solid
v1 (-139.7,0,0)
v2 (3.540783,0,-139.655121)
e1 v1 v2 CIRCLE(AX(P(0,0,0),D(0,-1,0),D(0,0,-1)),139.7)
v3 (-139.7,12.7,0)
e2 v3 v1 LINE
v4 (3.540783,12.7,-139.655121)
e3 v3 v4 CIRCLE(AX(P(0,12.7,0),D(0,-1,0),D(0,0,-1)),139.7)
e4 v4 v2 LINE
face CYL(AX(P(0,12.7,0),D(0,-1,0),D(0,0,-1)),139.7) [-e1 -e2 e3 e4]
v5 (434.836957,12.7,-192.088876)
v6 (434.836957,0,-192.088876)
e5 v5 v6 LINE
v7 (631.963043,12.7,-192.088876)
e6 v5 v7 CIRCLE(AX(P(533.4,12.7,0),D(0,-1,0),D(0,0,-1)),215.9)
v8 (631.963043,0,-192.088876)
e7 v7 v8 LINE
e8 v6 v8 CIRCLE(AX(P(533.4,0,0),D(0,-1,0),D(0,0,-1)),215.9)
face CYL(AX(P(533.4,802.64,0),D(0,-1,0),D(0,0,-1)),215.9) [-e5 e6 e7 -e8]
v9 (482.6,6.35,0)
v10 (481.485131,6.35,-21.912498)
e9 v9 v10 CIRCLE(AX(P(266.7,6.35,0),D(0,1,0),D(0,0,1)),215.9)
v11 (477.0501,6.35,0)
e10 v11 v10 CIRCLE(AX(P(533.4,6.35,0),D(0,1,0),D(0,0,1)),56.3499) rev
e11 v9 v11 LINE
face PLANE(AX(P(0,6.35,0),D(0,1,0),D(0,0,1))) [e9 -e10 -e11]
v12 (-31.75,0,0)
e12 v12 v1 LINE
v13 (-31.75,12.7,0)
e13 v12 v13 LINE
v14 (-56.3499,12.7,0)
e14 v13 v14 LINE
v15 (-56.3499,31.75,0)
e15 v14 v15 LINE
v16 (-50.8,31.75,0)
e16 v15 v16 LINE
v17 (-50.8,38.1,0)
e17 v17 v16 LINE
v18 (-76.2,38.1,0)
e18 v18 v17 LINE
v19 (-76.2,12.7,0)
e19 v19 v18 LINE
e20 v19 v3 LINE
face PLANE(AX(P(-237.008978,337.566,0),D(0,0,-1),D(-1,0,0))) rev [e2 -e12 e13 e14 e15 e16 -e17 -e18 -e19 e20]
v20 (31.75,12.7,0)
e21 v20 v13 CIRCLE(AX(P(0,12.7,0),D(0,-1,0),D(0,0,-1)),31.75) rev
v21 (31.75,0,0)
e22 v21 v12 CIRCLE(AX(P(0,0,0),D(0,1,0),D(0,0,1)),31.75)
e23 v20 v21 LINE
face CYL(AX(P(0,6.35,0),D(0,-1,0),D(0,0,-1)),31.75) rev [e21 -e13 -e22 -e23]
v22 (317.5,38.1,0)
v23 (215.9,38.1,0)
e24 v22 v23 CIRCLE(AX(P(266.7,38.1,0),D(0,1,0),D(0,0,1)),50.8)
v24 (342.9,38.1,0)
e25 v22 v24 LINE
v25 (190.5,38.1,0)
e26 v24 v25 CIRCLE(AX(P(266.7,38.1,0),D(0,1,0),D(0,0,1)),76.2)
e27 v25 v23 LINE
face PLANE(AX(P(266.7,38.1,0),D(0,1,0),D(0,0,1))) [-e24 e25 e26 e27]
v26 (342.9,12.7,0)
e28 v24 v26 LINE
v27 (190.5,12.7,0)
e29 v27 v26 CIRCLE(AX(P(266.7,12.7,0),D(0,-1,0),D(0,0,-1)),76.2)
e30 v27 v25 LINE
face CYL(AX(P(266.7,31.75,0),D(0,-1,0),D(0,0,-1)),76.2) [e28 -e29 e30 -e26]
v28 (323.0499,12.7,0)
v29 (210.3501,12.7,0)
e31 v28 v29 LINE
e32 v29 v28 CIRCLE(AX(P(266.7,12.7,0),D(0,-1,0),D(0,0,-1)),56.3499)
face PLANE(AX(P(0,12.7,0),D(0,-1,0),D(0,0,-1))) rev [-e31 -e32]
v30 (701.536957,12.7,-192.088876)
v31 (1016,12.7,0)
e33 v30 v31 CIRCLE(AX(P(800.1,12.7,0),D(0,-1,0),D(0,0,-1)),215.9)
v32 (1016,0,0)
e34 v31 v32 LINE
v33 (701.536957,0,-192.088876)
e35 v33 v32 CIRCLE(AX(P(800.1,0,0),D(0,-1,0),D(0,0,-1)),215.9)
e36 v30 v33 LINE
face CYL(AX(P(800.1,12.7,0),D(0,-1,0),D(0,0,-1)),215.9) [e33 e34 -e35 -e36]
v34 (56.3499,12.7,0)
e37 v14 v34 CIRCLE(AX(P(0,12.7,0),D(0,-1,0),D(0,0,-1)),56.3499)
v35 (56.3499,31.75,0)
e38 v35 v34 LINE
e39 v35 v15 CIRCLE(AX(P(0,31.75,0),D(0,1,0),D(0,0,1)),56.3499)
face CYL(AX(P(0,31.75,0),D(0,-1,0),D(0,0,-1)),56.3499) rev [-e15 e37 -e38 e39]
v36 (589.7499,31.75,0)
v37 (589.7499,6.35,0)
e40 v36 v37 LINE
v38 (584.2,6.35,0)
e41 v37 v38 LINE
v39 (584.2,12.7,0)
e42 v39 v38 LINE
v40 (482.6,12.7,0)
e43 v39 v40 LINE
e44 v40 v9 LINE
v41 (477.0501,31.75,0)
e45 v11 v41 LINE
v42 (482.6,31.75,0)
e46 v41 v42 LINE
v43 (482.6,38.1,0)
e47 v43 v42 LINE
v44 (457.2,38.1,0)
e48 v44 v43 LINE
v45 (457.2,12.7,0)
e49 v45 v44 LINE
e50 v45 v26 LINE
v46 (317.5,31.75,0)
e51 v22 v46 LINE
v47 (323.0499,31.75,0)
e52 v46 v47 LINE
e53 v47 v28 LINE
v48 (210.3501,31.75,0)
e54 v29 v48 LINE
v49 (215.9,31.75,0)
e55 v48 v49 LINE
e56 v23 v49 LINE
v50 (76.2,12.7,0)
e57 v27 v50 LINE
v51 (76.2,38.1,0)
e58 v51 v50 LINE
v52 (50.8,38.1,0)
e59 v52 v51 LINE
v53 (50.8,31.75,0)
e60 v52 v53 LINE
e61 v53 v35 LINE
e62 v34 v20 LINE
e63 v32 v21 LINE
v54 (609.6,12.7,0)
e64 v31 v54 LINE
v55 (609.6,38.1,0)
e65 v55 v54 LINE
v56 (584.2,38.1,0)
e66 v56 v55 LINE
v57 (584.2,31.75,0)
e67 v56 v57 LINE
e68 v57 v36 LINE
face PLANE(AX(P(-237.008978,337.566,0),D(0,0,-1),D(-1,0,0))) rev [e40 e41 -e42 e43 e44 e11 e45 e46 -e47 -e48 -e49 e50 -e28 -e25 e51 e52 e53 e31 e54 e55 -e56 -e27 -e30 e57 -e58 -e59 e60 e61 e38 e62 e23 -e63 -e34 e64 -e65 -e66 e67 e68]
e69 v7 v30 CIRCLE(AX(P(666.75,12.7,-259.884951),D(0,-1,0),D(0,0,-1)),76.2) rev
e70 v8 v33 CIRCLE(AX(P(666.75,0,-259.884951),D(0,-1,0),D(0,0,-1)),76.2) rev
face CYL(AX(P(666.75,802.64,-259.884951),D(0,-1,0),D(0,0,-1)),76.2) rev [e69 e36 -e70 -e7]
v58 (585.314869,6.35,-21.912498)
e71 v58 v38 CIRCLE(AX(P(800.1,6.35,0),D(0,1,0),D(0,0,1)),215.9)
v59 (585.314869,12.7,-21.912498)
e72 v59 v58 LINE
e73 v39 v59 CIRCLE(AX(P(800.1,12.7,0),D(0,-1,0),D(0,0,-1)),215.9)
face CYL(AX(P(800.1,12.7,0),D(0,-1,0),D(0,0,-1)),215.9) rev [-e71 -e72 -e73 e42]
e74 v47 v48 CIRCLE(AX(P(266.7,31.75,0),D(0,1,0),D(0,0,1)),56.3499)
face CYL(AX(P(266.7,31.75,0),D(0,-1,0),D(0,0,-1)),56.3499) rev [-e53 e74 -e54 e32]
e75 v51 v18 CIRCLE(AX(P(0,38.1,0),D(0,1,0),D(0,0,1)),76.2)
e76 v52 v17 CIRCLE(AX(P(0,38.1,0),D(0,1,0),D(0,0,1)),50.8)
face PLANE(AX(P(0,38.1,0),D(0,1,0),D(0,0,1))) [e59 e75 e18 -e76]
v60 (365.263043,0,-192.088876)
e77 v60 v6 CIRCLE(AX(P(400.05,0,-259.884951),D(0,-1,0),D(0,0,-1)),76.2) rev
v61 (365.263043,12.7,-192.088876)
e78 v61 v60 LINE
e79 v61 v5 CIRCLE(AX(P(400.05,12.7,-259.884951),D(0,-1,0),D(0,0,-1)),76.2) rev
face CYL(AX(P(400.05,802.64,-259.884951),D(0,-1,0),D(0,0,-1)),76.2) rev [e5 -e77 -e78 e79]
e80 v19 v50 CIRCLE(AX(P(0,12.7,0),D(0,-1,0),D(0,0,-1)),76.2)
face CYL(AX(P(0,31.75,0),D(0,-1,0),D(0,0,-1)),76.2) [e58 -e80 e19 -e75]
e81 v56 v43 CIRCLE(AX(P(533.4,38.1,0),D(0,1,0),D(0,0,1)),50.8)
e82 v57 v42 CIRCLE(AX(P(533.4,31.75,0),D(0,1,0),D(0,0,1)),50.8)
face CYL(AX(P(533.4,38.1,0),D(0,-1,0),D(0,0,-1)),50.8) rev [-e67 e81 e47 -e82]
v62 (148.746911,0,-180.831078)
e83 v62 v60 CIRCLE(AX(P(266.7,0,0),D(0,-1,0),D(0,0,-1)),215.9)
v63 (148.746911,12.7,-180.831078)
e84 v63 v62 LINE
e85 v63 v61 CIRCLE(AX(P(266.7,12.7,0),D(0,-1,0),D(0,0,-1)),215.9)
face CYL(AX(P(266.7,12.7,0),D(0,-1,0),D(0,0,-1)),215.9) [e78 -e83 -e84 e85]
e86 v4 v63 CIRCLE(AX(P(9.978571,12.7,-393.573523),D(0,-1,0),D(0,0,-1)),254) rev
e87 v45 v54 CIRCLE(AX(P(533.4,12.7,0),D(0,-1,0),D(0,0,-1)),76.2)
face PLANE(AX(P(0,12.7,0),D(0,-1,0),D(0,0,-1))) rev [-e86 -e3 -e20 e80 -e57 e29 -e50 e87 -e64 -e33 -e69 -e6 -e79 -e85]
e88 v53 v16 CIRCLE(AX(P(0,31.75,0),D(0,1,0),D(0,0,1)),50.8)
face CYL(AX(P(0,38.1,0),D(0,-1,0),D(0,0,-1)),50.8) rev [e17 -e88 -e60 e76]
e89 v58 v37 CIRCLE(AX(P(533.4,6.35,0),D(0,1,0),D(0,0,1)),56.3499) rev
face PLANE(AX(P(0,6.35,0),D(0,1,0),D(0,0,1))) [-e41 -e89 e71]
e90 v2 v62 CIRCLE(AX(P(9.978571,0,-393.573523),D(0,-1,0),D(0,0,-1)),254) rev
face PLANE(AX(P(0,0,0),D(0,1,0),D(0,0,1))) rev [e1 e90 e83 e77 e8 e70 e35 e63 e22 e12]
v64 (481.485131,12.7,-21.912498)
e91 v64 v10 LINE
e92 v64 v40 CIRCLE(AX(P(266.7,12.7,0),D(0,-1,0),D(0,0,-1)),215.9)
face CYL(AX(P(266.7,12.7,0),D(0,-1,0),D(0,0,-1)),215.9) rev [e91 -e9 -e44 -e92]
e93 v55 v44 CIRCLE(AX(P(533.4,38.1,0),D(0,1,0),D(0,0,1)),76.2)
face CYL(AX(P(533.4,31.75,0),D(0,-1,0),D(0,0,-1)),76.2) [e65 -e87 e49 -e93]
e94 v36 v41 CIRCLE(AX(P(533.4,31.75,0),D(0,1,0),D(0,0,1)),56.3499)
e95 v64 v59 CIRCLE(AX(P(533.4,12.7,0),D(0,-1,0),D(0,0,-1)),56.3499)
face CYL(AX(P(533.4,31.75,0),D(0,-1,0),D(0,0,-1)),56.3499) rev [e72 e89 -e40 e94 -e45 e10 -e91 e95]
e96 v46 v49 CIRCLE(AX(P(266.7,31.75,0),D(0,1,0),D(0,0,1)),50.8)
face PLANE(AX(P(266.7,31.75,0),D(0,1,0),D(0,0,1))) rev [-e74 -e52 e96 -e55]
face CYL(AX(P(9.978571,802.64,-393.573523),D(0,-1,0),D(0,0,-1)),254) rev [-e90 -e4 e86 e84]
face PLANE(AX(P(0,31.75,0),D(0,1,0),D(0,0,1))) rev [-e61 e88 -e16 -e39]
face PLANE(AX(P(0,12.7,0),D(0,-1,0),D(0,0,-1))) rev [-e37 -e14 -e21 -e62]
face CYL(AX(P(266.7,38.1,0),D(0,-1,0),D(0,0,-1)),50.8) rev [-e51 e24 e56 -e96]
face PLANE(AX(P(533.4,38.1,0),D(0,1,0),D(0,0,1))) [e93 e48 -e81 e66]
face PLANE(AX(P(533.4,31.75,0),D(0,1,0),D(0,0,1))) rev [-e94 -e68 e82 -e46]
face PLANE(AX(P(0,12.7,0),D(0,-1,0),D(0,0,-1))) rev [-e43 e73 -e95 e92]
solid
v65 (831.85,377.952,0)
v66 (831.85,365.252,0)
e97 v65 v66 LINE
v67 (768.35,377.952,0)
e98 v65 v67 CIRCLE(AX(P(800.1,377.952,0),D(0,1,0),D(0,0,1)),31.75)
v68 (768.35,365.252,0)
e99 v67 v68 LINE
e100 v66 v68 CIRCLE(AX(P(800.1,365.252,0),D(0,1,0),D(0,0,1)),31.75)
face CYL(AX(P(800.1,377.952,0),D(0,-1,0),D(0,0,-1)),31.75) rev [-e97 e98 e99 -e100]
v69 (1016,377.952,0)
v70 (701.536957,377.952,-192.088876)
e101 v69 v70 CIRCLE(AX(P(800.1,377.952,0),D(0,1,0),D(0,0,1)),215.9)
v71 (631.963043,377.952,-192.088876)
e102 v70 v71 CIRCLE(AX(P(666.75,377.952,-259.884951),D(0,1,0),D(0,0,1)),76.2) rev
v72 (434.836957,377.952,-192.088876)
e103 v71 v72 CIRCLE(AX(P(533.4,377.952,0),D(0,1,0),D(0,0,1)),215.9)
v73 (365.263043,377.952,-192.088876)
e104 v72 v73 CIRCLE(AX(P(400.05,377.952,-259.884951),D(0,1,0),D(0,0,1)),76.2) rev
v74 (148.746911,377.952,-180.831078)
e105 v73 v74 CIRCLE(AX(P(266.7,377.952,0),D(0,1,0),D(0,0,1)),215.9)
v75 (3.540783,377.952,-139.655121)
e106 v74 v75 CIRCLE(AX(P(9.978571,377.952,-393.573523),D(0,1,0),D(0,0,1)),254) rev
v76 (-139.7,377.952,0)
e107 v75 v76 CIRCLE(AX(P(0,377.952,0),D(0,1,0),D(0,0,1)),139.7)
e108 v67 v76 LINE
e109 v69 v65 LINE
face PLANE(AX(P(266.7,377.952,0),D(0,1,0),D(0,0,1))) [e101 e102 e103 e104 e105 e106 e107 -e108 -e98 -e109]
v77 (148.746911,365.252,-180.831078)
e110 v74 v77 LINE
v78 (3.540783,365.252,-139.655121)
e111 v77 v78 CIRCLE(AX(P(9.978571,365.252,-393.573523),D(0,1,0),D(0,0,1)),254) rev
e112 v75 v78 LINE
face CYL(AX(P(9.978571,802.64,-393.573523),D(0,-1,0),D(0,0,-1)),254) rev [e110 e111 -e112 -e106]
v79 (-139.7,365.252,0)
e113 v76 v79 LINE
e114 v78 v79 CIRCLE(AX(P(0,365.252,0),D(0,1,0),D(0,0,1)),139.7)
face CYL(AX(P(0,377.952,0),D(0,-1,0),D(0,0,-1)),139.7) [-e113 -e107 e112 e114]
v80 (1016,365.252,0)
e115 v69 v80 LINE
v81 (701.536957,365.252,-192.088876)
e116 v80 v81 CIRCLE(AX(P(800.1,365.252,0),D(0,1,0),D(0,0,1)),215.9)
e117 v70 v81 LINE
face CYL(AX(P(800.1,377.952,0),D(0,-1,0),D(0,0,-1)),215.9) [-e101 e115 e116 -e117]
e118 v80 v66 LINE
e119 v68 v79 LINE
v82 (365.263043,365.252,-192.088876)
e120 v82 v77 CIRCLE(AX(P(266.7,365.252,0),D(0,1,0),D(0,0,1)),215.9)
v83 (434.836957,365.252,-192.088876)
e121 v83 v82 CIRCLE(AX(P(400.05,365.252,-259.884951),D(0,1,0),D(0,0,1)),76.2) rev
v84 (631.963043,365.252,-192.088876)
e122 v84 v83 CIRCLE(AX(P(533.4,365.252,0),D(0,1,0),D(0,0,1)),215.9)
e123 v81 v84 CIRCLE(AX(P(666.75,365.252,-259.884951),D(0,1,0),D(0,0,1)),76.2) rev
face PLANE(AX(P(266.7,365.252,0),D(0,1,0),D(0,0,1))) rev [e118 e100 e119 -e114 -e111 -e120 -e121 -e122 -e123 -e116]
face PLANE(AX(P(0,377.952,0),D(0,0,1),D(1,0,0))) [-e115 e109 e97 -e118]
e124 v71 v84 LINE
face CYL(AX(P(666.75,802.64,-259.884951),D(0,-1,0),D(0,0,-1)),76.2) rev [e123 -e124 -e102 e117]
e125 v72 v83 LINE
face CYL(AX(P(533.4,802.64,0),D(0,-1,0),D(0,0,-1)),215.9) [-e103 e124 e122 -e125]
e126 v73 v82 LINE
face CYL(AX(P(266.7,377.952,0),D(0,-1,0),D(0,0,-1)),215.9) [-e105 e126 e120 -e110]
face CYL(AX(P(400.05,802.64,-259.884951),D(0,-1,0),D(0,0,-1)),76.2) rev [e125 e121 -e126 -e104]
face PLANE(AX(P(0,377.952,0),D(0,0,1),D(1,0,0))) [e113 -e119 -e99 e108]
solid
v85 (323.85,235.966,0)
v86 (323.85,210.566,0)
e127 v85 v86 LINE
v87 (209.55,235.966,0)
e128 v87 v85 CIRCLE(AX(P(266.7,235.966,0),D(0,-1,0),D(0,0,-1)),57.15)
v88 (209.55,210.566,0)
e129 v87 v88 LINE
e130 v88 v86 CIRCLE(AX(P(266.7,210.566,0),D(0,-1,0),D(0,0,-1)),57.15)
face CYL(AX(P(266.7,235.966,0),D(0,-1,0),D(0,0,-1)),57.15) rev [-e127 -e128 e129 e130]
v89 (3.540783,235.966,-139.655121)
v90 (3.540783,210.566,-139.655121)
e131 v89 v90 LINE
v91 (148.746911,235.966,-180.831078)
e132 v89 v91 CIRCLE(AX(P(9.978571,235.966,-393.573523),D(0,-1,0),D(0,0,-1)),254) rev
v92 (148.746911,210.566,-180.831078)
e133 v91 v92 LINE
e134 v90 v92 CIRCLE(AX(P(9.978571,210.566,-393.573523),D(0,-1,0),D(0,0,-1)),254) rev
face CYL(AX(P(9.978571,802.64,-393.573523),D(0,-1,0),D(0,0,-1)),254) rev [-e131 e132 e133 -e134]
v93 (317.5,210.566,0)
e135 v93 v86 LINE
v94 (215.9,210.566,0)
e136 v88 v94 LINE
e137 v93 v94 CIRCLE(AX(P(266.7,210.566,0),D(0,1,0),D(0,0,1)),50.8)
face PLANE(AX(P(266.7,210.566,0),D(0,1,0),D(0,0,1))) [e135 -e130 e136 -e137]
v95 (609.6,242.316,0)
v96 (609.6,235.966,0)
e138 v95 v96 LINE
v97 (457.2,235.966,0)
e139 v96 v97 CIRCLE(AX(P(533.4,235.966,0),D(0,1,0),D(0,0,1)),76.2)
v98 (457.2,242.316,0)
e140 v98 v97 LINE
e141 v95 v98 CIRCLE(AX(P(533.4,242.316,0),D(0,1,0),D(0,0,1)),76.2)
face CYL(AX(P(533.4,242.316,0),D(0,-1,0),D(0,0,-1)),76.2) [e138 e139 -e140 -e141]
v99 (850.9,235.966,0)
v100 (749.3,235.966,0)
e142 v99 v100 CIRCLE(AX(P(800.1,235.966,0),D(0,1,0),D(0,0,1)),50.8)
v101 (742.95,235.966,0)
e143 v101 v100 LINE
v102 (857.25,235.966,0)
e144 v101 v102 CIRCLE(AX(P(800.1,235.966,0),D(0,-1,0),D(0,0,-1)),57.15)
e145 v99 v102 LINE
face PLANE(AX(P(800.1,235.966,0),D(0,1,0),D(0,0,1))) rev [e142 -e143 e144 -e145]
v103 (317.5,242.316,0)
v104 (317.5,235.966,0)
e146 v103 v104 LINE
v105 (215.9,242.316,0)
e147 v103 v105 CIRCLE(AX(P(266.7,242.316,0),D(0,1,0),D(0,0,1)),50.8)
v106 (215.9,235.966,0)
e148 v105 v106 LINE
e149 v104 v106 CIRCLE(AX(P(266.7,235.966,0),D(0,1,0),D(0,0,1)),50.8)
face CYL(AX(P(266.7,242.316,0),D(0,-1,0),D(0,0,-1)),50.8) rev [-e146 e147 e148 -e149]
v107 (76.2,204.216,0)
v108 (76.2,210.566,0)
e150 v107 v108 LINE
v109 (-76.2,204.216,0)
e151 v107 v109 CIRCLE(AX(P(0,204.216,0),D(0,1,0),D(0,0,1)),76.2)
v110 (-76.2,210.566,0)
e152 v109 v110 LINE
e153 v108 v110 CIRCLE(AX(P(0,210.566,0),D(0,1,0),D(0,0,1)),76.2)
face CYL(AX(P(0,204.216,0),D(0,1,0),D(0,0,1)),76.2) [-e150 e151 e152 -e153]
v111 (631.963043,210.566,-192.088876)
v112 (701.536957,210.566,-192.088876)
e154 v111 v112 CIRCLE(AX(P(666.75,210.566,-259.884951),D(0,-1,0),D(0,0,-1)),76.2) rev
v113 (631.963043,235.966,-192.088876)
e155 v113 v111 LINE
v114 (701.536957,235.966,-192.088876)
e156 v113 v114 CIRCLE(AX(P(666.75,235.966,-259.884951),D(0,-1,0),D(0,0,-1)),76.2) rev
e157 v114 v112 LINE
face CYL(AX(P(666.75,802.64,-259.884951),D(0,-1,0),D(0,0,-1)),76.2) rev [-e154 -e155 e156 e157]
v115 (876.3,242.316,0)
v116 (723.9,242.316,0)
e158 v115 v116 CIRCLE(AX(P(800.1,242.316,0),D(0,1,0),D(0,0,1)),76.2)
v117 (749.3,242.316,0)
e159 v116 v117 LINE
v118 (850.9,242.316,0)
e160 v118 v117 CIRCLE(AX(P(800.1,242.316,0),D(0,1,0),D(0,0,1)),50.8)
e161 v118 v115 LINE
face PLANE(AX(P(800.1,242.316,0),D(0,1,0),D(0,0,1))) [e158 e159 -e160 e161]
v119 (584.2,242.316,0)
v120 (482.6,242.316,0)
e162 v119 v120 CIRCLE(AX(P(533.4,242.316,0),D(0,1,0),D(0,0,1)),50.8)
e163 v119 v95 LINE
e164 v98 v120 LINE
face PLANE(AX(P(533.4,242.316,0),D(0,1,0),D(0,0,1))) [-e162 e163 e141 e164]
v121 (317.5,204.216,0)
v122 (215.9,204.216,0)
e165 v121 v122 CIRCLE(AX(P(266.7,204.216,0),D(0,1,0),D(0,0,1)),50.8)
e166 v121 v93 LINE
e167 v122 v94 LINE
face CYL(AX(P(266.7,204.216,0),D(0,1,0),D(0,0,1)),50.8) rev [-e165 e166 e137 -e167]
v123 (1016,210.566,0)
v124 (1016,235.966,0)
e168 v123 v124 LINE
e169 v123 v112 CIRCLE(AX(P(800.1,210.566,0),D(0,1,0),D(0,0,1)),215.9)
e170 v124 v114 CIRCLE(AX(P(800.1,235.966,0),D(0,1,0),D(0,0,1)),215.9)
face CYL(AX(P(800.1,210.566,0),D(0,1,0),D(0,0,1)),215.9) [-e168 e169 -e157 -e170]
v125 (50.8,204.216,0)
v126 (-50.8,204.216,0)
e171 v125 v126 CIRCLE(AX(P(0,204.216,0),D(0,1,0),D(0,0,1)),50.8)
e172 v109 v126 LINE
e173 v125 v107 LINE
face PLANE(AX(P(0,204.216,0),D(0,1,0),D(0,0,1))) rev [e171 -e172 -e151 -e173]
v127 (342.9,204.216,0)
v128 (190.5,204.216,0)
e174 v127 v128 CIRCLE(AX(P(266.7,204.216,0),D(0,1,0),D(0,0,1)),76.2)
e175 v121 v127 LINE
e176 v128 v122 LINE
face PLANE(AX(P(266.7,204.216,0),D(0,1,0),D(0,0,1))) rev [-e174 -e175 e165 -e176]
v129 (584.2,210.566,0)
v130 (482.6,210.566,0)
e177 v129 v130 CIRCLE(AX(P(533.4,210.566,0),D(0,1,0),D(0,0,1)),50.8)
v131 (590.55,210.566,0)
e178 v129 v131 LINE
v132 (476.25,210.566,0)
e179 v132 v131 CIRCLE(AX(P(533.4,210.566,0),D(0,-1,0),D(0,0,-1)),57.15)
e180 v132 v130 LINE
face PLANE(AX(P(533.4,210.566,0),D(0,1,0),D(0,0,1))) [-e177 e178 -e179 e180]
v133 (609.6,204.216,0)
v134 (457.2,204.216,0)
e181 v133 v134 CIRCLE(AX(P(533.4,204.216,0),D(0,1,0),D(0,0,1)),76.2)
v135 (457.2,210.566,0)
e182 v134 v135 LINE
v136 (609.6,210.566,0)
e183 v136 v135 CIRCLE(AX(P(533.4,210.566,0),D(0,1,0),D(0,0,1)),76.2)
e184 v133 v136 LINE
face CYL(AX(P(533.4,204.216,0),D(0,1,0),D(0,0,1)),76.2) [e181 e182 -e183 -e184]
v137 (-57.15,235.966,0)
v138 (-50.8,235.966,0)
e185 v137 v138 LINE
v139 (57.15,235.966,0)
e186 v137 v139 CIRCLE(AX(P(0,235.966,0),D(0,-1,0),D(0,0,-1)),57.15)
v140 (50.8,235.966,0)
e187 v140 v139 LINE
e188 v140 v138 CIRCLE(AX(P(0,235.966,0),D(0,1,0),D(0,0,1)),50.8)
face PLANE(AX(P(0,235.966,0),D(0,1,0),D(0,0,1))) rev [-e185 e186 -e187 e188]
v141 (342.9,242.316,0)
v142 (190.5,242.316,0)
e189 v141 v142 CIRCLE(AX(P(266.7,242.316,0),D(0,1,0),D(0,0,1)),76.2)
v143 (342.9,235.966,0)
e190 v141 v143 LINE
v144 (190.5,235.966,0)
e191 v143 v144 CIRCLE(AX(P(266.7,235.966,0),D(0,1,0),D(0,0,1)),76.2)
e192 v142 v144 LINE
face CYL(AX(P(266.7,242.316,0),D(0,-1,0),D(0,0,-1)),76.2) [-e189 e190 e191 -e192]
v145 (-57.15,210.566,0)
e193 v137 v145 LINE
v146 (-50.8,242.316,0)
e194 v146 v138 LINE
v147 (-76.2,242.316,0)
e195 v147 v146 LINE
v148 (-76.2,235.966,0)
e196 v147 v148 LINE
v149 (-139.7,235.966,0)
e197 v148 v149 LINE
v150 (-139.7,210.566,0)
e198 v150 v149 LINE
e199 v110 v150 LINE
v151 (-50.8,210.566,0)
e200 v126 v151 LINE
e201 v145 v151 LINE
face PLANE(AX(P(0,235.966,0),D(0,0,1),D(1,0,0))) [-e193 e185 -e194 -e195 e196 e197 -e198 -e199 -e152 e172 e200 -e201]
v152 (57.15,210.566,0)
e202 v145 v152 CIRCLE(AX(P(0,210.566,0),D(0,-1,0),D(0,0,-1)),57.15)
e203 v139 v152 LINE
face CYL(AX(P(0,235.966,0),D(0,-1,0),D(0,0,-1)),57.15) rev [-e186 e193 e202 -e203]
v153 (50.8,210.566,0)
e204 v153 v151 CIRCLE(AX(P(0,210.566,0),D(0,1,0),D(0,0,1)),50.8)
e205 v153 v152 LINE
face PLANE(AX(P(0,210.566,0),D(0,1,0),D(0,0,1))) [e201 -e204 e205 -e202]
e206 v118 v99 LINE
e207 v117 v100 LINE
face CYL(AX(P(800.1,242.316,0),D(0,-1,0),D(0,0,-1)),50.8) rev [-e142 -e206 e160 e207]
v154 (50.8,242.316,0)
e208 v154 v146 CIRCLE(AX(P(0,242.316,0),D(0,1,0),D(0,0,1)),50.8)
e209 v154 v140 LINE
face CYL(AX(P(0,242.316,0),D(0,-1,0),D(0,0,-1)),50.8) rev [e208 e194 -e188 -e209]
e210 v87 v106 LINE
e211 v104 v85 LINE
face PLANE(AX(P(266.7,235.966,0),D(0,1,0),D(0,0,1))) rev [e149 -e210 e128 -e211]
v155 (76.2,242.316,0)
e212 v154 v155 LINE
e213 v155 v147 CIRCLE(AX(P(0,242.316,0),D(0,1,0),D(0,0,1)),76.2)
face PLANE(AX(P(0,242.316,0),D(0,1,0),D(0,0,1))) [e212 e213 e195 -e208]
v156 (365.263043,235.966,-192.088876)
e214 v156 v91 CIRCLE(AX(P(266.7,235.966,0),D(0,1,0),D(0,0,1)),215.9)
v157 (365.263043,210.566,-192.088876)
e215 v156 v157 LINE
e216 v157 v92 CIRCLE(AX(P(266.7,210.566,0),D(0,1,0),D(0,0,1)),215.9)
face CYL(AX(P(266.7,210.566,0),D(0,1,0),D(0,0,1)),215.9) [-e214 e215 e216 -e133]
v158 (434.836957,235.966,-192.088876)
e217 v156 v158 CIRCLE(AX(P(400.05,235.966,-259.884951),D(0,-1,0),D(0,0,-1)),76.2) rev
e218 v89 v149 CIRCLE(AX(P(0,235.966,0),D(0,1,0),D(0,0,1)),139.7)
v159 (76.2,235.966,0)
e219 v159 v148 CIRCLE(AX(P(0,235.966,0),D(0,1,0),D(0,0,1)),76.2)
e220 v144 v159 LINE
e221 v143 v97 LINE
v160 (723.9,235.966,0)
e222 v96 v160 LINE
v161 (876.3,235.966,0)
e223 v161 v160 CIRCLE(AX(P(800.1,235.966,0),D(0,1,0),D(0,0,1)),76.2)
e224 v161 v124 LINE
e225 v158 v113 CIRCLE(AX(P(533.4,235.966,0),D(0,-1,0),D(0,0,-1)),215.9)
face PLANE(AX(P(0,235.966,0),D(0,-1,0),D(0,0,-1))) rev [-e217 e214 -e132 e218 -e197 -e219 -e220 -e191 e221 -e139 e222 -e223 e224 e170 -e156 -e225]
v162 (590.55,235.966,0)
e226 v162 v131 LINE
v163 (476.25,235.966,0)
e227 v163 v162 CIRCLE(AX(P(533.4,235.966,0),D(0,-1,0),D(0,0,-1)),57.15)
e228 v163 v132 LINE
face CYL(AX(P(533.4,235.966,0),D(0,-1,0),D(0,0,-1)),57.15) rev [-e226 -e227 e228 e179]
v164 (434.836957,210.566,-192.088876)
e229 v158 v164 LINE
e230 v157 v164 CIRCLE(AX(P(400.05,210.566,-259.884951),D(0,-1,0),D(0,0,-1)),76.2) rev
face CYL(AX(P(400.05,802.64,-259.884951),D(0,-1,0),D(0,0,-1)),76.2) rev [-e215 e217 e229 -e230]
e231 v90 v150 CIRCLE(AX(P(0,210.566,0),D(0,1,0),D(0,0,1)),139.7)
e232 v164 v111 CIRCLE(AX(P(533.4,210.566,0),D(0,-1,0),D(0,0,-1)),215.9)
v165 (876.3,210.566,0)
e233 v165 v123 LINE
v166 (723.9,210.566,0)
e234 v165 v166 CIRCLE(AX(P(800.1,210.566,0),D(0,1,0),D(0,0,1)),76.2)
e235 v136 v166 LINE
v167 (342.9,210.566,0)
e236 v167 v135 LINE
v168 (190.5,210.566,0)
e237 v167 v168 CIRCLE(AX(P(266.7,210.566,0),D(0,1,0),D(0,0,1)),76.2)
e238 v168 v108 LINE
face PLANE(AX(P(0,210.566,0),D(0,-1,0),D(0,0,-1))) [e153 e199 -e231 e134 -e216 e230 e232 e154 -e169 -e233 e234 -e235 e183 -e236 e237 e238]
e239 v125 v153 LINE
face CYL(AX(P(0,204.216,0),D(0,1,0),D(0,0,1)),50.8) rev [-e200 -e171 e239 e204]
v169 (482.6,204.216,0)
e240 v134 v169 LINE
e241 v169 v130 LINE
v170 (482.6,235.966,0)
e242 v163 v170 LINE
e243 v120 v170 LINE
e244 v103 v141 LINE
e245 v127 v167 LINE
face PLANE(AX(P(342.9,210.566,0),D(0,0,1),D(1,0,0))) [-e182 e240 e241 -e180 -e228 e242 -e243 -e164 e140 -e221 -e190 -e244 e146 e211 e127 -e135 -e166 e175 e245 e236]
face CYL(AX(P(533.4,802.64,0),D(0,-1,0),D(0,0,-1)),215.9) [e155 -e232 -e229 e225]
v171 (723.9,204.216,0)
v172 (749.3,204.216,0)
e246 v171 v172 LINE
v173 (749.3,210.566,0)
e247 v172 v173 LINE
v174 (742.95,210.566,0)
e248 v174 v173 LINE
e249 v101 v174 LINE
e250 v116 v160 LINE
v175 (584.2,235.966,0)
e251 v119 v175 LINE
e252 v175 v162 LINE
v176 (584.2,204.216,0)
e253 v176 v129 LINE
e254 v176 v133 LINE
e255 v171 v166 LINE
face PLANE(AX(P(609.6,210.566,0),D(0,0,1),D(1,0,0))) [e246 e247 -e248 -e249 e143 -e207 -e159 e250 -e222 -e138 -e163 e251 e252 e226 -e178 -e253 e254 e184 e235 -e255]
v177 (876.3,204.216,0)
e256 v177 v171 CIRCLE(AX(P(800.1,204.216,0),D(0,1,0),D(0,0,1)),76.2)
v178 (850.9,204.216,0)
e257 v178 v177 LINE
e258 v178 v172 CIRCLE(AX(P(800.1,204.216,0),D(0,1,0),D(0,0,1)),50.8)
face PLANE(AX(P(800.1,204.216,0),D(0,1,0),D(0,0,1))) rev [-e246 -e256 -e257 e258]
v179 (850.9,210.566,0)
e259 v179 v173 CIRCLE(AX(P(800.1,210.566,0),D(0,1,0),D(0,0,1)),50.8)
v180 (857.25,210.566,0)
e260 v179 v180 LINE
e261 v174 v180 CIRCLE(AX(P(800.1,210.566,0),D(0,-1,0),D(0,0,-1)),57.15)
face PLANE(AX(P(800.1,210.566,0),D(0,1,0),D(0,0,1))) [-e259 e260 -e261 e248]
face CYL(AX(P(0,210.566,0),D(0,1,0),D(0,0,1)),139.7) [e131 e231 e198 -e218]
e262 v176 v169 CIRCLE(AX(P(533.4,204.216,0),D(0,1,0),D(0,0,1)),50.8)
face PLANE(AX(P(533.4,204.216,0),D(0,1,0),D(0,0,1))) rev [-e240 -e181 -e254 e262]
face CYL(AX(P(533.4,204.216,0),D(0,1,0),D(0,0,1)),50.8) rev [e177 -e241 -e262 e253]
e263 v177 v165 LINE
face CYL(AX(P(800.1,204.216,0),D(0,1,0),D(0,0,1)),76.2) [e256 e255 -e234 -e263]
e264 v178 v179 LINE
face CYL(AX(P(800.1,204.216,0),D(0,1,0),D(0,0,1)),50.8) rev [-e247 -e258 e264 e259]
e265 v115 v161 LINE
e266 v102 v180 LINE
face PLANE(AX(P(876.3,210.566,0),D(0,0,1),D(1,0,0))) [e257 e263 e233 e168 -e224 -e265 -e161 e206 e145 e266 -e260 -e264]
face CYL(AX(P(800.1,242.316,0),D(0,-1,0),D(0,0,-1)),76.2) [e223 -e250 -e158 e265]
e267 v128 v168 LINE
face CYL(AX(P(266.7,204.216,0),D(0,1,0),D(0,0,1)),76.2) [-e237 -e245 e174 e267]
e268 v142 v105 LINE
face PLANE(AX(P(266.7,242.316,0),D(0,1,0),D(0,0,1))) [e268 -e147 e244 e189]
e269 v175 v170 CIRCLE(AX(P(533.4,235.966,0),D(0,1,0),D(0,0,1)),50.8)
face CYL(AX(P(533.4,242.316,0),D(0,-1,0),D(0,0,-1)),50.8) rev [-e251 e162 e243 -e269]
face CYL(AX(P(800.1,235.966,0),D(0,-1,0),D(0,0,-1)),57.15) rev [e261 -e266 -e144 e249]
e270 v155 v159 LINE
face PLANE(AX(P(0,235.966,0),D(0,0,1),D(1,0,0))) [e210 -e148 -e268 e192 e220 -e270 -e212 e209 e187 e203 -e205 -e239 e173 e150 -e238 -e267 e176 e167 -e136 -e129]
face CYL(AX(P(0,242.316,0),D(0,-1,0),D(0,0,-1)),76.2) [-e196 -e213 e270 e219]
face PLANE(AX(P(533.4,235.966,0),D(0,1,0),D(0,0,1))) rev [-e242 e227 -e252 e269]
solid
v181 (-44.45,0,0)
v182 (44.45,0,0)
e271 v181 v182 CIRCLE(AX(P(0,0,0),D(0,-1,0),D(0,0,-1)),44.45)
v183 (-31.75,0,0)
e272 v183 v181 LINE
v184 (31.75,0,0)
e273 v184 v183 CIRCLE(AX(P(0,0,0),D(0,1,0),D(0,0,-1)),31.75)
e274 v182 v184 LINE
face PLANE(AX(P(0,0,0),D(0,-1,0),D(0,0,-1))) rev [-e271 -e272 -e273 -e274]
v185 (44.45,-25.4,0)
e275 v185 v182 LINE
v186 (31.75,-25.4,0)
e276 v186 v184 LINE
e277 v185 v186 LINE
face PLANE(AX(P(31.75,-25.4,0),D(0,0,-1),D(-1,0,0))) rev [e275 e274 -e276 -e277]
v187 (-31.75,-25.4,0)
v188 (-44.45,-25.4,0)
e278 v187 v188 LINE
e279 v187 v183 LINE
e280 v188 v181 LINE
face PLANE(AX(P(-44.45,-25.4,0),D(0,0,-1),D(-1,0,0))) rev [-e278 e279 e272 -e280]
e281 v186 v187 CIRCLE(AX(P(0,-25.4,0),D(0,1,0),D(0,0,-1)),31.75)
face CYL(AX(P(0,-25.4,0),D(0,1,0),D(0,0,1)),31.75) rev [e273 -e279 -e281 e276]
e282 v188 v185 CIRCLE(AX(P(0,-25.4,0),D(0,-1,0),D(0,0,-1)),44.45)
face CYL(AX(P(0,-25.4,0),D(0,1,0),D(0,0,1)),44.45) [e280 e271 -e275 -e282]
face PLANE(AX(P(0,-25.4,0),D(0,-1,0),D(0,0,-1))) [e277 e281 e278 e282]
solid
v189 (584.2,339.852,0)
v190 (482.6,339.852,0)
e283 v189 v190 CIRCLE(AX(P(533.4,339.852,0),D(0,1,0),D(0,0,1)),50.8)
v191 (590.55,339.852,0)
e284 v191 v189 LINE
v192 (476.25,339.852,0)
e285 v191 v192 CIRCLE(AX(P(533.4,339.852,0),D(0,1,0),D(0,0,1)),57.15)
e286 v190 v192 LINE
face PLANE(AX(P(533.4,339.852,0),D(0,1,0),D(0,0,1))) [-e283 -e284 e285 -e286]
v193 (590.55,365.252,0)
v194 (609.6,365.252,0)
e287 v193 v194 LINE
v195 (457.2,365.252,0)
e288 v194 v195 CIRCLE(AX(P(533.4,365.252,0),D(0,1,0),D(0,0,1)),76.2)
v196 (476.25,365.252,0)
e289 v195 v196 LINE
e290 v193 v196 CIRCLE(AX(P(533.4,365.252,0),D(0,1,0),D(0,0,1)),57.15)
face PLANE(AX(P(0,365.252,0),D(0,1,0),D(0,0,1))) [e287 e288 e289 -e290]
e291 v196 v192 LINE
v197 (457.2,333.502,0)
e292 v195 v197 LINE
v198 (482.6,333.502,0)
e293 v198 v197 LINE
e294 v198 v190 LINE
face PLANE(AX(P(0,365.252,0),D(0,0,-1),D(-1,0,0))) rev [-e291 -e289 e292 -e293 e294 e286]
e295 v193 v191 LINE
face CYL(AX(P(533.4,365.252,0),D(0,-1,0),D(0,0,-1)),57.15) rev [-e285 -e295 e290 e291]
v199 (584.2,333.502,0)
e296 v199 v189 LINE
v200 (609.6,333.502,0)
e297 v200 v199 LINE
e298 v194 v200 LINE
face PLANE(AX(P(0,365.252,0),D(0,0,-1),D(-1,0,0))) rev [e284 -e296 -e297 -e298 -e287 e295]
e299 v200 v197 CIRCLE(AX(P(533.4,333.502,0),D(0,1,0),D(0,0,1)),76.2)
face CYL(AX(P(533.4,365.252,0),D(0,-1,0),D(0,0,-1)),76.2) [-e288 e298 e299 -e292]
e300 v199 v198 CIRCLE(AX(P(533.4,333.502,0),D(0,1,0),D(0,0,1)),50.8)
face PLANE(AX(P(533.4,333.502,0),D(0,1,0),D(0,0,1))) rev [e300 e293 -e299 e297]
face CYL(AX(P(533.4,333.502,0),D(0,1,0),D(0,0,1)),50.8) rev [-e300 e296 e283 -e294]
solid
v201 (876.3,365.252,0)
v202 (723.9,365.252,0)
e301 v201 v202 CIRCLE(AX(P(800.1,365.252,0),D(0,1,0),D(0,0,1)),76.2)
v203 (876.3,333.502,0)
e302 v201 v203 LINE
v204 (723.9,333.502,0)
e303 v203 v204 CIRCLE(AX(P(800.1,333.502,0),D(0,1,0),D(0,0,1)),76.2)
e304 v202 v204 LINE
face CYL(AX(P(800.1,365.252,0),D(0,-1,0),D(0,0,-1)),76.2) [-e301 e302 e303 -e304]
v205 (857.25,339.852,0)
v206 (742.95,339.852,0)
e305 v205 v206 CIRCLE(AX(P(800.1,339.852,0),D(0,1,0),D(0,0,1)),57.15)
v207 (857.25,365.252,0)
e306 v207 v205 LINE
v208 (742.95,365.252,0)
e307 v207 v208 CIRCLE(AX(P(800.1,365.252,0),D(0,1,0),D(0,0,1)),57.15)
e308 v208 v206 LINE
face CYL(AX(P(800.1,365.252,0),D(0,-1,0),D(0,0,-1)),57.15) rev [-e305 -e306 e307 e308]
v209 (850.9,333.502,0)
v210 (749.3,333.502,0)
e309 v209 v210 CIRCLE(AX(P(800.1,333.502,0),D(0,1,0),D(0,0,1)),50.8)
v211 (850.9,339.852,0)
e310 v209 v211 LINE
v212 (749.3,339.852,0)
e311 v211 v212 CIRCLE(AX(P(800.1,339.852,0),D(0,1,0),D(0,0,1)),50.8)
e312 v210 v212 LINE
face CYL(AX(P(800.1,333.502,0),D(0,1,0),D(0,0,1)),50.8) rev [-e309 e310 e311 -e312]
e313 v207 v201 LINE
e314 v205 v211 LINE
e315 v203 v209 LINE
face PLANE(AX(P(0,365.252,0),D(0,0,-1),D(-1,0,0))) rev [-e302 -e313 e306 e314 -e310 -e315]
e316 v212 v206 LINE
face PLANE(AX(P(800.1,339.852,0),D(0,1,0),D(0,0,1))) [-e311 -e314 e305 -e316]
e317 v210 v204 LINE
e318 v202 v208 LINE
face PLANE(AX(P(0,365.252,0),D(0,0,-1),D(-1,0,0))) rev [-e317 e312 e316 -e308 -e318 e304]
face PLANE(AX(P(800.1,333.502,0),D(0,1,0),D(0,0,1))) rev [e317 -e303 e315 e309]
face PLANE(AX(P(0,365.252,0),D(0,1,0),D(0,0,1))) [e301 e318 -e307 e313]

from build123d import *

# Parameters (mm, degrees)
SKETCH1_R               = 31.75
BOSS_EXTRUDE1_DEPTH     = 6.35
SKETCH1_5_R             = 76.2
SKETCH1_5_R_2           = 56.3499
BOSS_EXTRUDE2_DEPTH     = 31.75
CUT_EXTRUDE1_DEPTH      = 331.216
CUT_EXTRUDE1_DEPTH_BACK = 329.946
SKETCH3_W               = 1329.198210048
SKETCH3_H               = 309.557135386
BOSS_EXTRUDE7_DEPTH     = 6.35
LPATTERN4_COUNT         = 4
LPATTERN4_PITCH         = 266.7
BOSS_EXTRUDE9_START     = -210.566
BOSS_EXTRUDE9_DEPTH     = 25.4
LPATTERN6_COUNT         = 4
LPATTERN6_PITCH         = 266.7
BOSS_EXTRUDE10_START    = -12.7
BOSS_EXTRUDE10_DEPTH    = 12.7
BOSS_EXTRUDE11_DEPTH    = 25.4
BOSS_EXTRUDE13_DEPTH    = 6.35
BOSS_EXTRUDE14_START    = -31.75
BOSS_EXTRUDE14_DEPTH    = 6.35
LPATTERN7_COUNT         = 4
LPATTERN7_PITCH         = 266.7
SKETCH15_R              = 77.31521383
CUT_EXTRUDE4_DEPTH      = 25.4
BOSS_EXTRUDE16_START    = 97.536
BOSS_EXTRUDE16_DEPTH    = 25.4
BOSS_EXTRUDE16_2_DEPTH  = 25.4
BOSS_EXTRUDE17_START    = 91.186
BOSS_EXTRUDE17_DEPTH    = 6.35
BOSS_EXTRUDE18_START    = 122.936
BOSS_EXTRUDE18_DEPTH    = 12.7
CUT_EXTRUDE11_START     = -802.64
CUT_EXTRUDE11_DEPTH     = 802.64
BOSS_EXTRUDE27_DEPTH    = 25.4


# Read off the part's stored shape, not the designer's step: Boss-Extrude10
with BuildPart() as part:
    # Sketch1 → Boss-Extrude1 (new body)
    with BuildSketch(Plane(origin=(0, 0, 0), x_dir=(1, 0, 0), z_dir=(0, 1, 0))):
        with BuildLine():
            ThreePointArc((422.728571429, -85.252125475), (557.978233446, -137.520909104), (666.75, -41.639734629))
            ThreePointArc((666.75, -41.639734629), (912.645903808, -82.761763733), (800.1, 139.7))
            Line((800.1, 139.7), (533.4, 139.7))
            Line((533.4, 139.7), (293.135129627, 175.823843439))
            ThreePointArc((293.135129627, 175.823843439), (249.780889695, 176.99317418), (207.433333333, 167.631447593))
            Line((207.433333333, 167.631447593), (-29.633333333, 83.815723797))
            ThreePointArc((-29.633333333, 83.815723797), (-88.9, 0), (-29.633333333, -83.815723797))
            Line((-29.633333333, -83.815723797), (207.433333333, -167.631447593))
            ThreePointArc((207.433333333, -167.631447593), (330.23978857, -166.058830745), (422.728571429, -85.252125475))
        make_face()
        with Locations(Location((0, 0, 0), (0, 0, 270))):
            Circle(SKETCH1_R, mode=Mode.SUBTRACT)
    extrude(amount=BOSS_EXTRUDE1_DEPTH)

    # Sketch1<5> → Boss-Extrude2 (add)
    # profile 1 of 4: a face of its own
    with BuildSketch(Plane(origin=(0, 0, 0), x_dir=(1, 0, 0), z_dir=(0, 1, 0))):
        with Locations(Location((0, 0, 0), (0, 0, 270))):
            Circle(SKETCH1_5_R)
        with Locations(Location((0, 0, 0), (0, 0, 270))):
            Circle(SKETCH1_5_R_2, mode=Mode.SUBTRACT)
    # profile 2 of 4: a face of its own
    with BuildSketch(Plane(origin=(0, 0, 0), x_dir=(1, 0, 0), z_dir=(0, 1, 0))):
        with Locations(Location((266.7, 0, 0), (0, 0, 270))):
            Circle(SKETCH1_5_R)
        with Locations(Location((266.7, 0, 0), (0, 0, 270))):
            Circle(SKETCH1_5_R_2, mode=Mode.SUBTRACT)
    # profile 3 of 4: a face of its own
    with BuildSketch(Plane(origin=(0, 0, 0), x_dir=(1, 0, 0), z_dir=(0, 1, 0))):
        with Locations(Location((533.4, 0, 0), (0, 0, 270))):
            Circle(SKETCH1_5_R)
        with Locations(Location((533.4, 0, 0), (0, 0, 270))):
            Circle(SKETCH1_5_R_2, mode=Mode.SUBTRACT)
    # profile 4 of 4: a face of its own
    with BuildSketch(Plane(origin=(0, 0, 0), x_dir=(1, 0, 0), z_dir=(0, 1, 0))):
        with Locations(Location((800.1, 0, 0), (0, 0, 270))):
            Circle(SKETCH1_5_R)
        with Locations(Location((800.1, 0, 0), (0, 0, 270))):
            Circle(SKETCH1_5_R_2, mode=Mode.SUBTRACT)
    extrude(amount=BOSS_EXTRUDE2_DEPTH)

    # Sketch3 → Cut-Extrude1 (cut, two sides: drawn at the far end of the back side and taken through both)
    with BuildSketch(Plane(origin=(0, 6.35, 0), x_dir=(1, 0, 0), z_dir=(0, 1, 0)).offset(-CUT_EXTRUDE1_DEPTH_BACK)):
        with Locations((427.590126739, -154.778567693)):
            Rectangle(SKETCH3_W, SKETCH3_H)
    extrude(amount=CUT_EXTRUDE1_DEPTH + CUT_EXTRUDE1_DEPTH_BACK, mode=Mode.SUBTRACT)

    # Sketch5 → Boss-Extrude7 (add)
    with BuildSketch(Plane(origin=(0, 31.75, 0), x_dir=(1, 0, 0), z_dir=(0, 1, 0))):
        with BuildLine():
            ThreePointArc((56.3499, 0), (0, 56.3499), (-56.3499, 0))
            Line((-56.3499, 0), (-50.8, 0))
            ThreePointArc((-50.8, 0), (0, 50.8), (50.8, 0))
            Line((50.8, 0), (56.3499, 0))
        make_face()
        with BuildLine():
            Line((56.3499, 0), (76.2, 0))
            ThreePointArc((76.2, 0), (0, 76.2), (-76.2, 0))
            Line((-76.2, 0), (-56.3499, 0))
            ThreePointArc((-56.3499, 0), (0, 56.3499), (56.3499, 0))
        make_face()
    boss_extrude7 = extrude(amount=BOSS_EXTRUDE7_DEPTH)

    # LPattern4: Boss-Extrude7 ×4
    with Locations(*[(i * LPATTERN4_PITCH, 0, 0) for i in range(1, LPATTERN4_COUNT)]):
        add(boss_extrude7)

    # Boss-Extrude10 outline → Boss-Extrude10 (add)
    with BuildSketch(Plane.XZ.offset(BOSS_EXTRUDE10_START)):
        with BuildLine():
            ThreePointArc((-139.7, 0), (-112.009186485, -83.486718362), (-39.914285714, -133.876584196))
            Line((-39.914285714, -133.876584196), (205.014285714, -206.900175575))
            ThreePointArc((205.014285714, -206.900175575), (235.530607214, -213.638196382), (266.7, -215.9))
            Line((266.7, -215.9), (800.1, -215.9))
            ThreePointArc((800.1, -215.9), (952.764354058, -152.664354058), (1016, 0))
            Line((1016, 0), (876.3, 0))
            ThreePointArc((876.3, 0), (800.1, -76.2), (723.9, 0))
            Line((723.9, 0), (609.6, 0))
            ThreePointArc((609.6, 0), (533.4, -76.2), (457.2, 0))
            Line((457.2, 0), (342.9, 0))
            ThreePointArc((342.9, 0), (266.7, -76.2), (190.5, 0))
            Line((190.5, 0), (76.2, 0))
            ThreePointArc((76.2, 0), (0, -76.2), (-76.2, 0))
            Line((-76.2, 0), (-139.7, 0))
        make_face()
        with BuildLine():
            Line((-31.75, 0), (-56.3499, 0))
            ThreePointArc((-56.3499, 0), (0, -56.3499), (56.3499, 0))
            Line((56.3499, 0), (31.75, 0))
            ThreePointArc((31.75, 0), (0, -31.75), (-31.75, 0))
        make_face()
        with BuildLine():
            Line((323.0499, 0), (210.3501, 0))
            ThreePointArc((210.3501, 0), (266.7, -56.3499), (323.0499, 0))
        make_face()
        with BuildLine():
            Line((584.2, 0), (482.6, 0))
            ThreePointArc((482.6, 0), (482.321102562, -10.97042068), (481.485130802, -21.912498402))
            ThreePointArc((481.485130802, -21.912498402), (533.4, -56.3499), (585.314869198, -21.912498402))
            ThreePointArc((585.314869198, -21.912498402), (584.478897438, -10.97042068), (584.2, 0))
        make_face()
        with BuildLine():
            ThreePointArc((743.7501, 0), (800.1, -56.3499), (856.4499, 0))
            Line((856.4499, 0), (743.7501, 0))
        make_face()
    extrude(amount=BOSS_EXTRUDE10_DEPTH)

    # Sketch15 → Cut-Extrude4 (cut)
    with BuildSketch(Plane(origin=(0, 38.1, 0), x_dir=(1, 0, 0), z_dir=(0, 1, 0))):
        with Locations((800.1, 0)):
            Circle(SKETCH15_R)
    extrude(amount=-CUT_EXTRUDE4_DEPTH, mode=Mode.SUBTRACT)


with BuildPart() as body_2:
    # Sketch8 → Boss-Extrude9 (new body)
    with BuildSketch(Plane.XZ.offset(BOSS_EXTRUDE9_START)):
        with BuildLine():
            Line((76.2, 0), (57.15, 0))
            ThreePointArc((57.15, 0), (0, -57.15), (-57.15, 0))
            Line((-57.15, 0), (-76.2, 0))
            ThreePointArc((-76.2, 0), (0, -76.2), (76.2, 0))
        make_face()
    boss_extrude9 = extrude(amount=-BOSS_EXTRUDE9_DEPTH)



with BuildPart() as lpattern6_1:
    # LPattern6: pattern copy
    add(boss_extrude9.moved(Location(Vector(1, 0, 0) * (1 * LPATTERN6_PITCH))))


with BuildPart() as lpattern6_2:
    # LPattern6: pattern copy
    add(boss_extrude9.moved(Location(Vector(1, 0, 0) * (2 * LPATTERN6_PITCH))))


with BuildPart() as lpattern6_3:
    # LPattern6: pattern copy
    add(boss_extrude9.moved(Location(Vector(1, 0, 0) * (3 * LPATTERN6_PITCH))))


with BuildPart() as body_2_1:
    add(body_2.part)

    add(lpattern6_1.part)  # Boss-Extrude11 merges LPattern6_1

    add(lpattern6_2.part)  # Boss-Extrude11 merges LPattern6_2

    add(lpattern6_3.part)  # Boss-Extrude11 merges LPattern6_3
    # Sketch11 → Boss-Extrude11 (add)
    with BuildSketch(Plane(origin=(0, 235.966, 0), x_dir=(1, 0, 0), z_dir=(0, 1, 0))):
        with BuildLine():
            Line((76.2, 0), (190.5, 0))
            ThreePointArc((190.5, 0), (266.7, 76.2), (342.9, 0))
            Line((342.9, 0), (457.2, 0))
            ThreePointArc((457.2, 0), (533.4, 76.2), (609.6, 0))
            Line((609.6, 0), (723.9, 0))
            ThreePointArc((723.9, 0), (800.1, 76.2), (876.3, 0))
            Line((876.3, 0), (1016, 0))
            ThreePointArc((1016, 0), (952.764354058, 152.664354058), (800.1, 215.9))
            Line((800.1, 215.9), (266.7, 215.9))
            ThreePointArc((266.7, 215.9), (235.530607214, 213.638196382), (205.014285714, 206.900175575))
            Line((205.014285714, 206.900175575), (-39.914285714, 133.876584196))
            ThreePointArc((-39.914285714, 133.876584196), (-112.009186485, 83.486718362), (-139.7, 0))
            Line((-139.7, 0), (-76.2, 0))
            ThreePointArc((-76.2, 0), (0, 76.2), (76.2, 0))
        make_face()
    extrude(amount=-BOSS_EXTRUDE11_DEPTH)

    # Sketch13 → Boss-Extrude13 (add)
    with BuildSketch(Plane(origin=(0, 235.966, 0), x_dir=(1, 0, 0), z_dir=(0, 1, 0))):
        with BuildLine():
            ThreePointArc((57.15, 0), (0, 57.15), (-57.15, 0))
            Line((-57.15, 0), (-50.8, 0))
            ThreePointArc((-50.8, 0), (0, 50.8), (50.8, 0))
            Line((50.8, 0), (57.15, 0))
        make_face()
        with BuildLine():
            ThreePointArc((76.2, 0), (0, 76.2), (-76.2, 0))
            Line((-76.2, 0), (-57.15, 0))
            ThreePointArc((-57.15, 0), (0, 57.15), (57.15, 0))
            Line((57.15, 0), (76.2, 0))
        make_face()
    boss_extrude13 = extrude(amount=BOSS_EXTRUDE13_DEPTH)

    # Sketch13<4> → Boss-Extrude14 (add)
    with BuildSketch(Plane(origin=(0, 235.966, 0), x_dir=(1, 0, 0), z_dir=(0, 1, 0)).offset(BOSS_EXTRUDE14_START)):
        with BuildLine():
            ThreePointArc((76.2, 0), (0, 76.2), (-76.2, 0))
            Line((-76.2, 0), (-57.15, 0))
            ThreePointArc((-57.15, 0), (0, 57.15), (57.15, 0))
            Line((57.15, 0), (76.2, 0))
        make_face()
        with BuildLine():
            ThreePointArc((57.15, 0), (0, 57.15), (-57.15, 0))
            Line((-57.15, 0), (-50.8, 0))
            ThreePointArc((-50.8, 0), (0, 50.8), (50.8, 0))
            Line((50.8, 0), (57.15, 0))
        make_face()
    boss_extrude14 = extrude(amount=BOSS_EXTRUDE14_DEPTH)

    # LPattern7: Boss-Extrude13, Boss-Extrude14 ×4
    with Locations(*[(i * LPATTERN7_PITCH, 0, 0) for i in range(1, LPATTERN7_COUNT)]):
        add(boss_extrude13)
        add(boss_extrude14)


with BuildPart() as body_3:
    # Sketch17 → Boss-Extrude16 (new body)
    with BuildSketch(Plane(origin=(0, 242.316, 0), x_dir=(1, 0, 0), z_dir=(0, 1, 0)).offset(BOSS_EXTRUDE16_START)):
        with BuildLine():
            Line((590.55, 0), (609.6, 0))
            ThreePointArc((609.6, 0), (533.4, 76.2), (457.2, 0))
            Line((457.2, 0), (476.25, 0))
            ThreePointArc((476.25, 0), (533.4, 57.15), (590.55, 0))
        make_face()
    extrude(amount=BOSS_EXTRUDE16_DEPTH)



with BuildPart() as body_4:
    # Sketch17 → Boss-Extrude16 2 (new body)
    with BuildSketch(Plane(origin=(0, 242.316, 0), x_dir=(1, 0, 0), z_dir=(0, 1, 0)).offset(BOSS_EXTRUDE16_START)):
        with BuildLine():
            ThreePointArc((742.95, 0), (800.1, 57.15), (857.25, 0))
            Line((857.25, 0), (876.3, 0))
            ThreePointArc((876.3, 0), (800.1, 76.2), (723.9, 0))
            Line((723.9, 0), (742.95, 0))
        make_face()
    extrude(amount=BOSS_EXTRUDE16_2_DEPTH)


with BuildPart() as body_3_1:
    add(body_3.part)

    add(body_4.part)  # Boss-Extrude17 merges body 4
    # Sketch17<3> → Boss-Extrude17 (add)
    with BuildSketch(Plane(origin=(0, 242.316, 0), x_dir=(1, 0, 0), z_dir=(0, 1, 0)).offset(BOSS_EXTRUDE17_START)):
        with BuildLine():
            Line((590.55, 0), (609.6, 0))
            ThreePointArc((609.6, 0), (533.4, 76.2), (457.2, 0))
            Line((457.2, 0), (476.25, 0))
            ThreePointArc((476.25, 0), (533.4, 57.15), (590.55, 0))
        make_face()
        with BuildLine():
            Line((584.2, 0), (590.55, 0))
            ThreePointArc((590.55, 0), (533.4, 57.15), (476.25, 0))
            Line((476.25, 0), (482.6, 0))
            ThreePointArc((482.6, 0), (533.4, 50.8), (584.2, 0))
        make_face()
        with BuildLine():
            ThreePointArc((749.3, 0), (800.1, 50.8), (850.9, 0))
            Line((850.9, 0), (857.25, 0))
            ThreePointArc((857.25, 0), (800.1, 57.15), (742.95, 0))
            Line((742.95, 0), (749.3, 0))
        make_face()
        with BuildLine():
            ThreePointArc((742.95, 0), (800.1, 57.15), (857.25, 0))
            Line((857.25, 0), (876.3, 0))
            ThreePointArc((876.3, 0), (800.1, 76.2), (723.9, 0))
            Line((723.9, 0), (742.95, 0))
        make_face()
    extrude(amount=BOSS_EXTRUDE17_DEPTH)


with BuildPart() as body_4_2:
    # Sketch17<4> → Boss-Extrude18 (new body)
    with BuildSketch(Plane(origin=(0, 242.316, 0), x_dir=(1, 0, 0), z_dir=(0, 1, 0)).offset(BOSS_EXTRUDE18_START)):
        with BuildLine():
            ThreePointArc((768.35, 0), (800.1, 31.75), (831.85, 0))
            Line((831.85, 0), (1016, 0))
            ThreePointArc((1016, 0), (952.764354058, 152.664354058), (800.1, 215.9))
            Line((800.1, 215.9), (266.7, 215.9))
            ThreePointArc((266.7, 215.9), (235.530607214, 213.638196382), (205.014285714, 206.900175575))
            Line((205.014285714, 206.900175575), (-39.914285714, 133.876584196))
            ThreePointArc((-39.914285714, 133.876584196), (-112.009186485, 83.486718362), (-139.7, 0))
            Line((-139.7, 0), (768.35, 0))
        make_face()
    extrude(amount=BOSS_EXTRUDE18_DEPTH)


with BuildPart() as cut_extrude11_tool:
    # Sketch19 → Cut-Extrude11 (new body)
    with BuildSketch(Plane.XZ.offset(CUT_EXTRUDE11_START)):
        with BuildLine():
            ThreePointArc((205.014285714, -206.900175575), (175.939742435, -195.896364557), (148.746911197, -180.831078197))
            ThreePointArc((148.746911197, -180.831078197), (79.272933335, -149.208445007), (3.54078341, -139.655121112))
            ThreePointArc((3.54078341, -139.655121112), (-18.414825269, -138.480988624), (-39.914285714, -133.876584196))
            Line((-39.914285714, -133.876584196), (205.014285714, -206.900175575))
        make_face()
        with BuildLine():
            ThreePointArc((533.4, -215.9), (482.70078121, -209.86281046), (434.836956522, -192.088876462))
            ThreePointArc((434.836956522, -192.088876462), (400.05, -183.684950507), (365.263043478, -192.088876462))
            ThreePointArc((365.263043478, -192.088876462), (317.39921879, -209.86281046), (266.7, -215.9))
            Line((266.7, -215.9), (533.4, -215.9))
        make_face()
        with BuildLine():
            Line((533.4, -215.9), (800.1, -215.9))
            ThreePointArc((800.1, -215.9), (749.40078121, -209.86281046), (701.536956522, -192.088876462))
            ThreePointArc((701.536956522, -192.088876462), (666.75, -183.684950507), (631.963043478, -192.088876462))
            ThreePointArc((631.963043478, -192.088876462), (584.09921879, -209.86281046), (533.4, -215.9))
        make_face()
    extrude(amount=CUT_EXTRUDE11_DEPTH)


with BuildPart() as part_1:
    add(part.part)

    # Cut-Extrude11: cut by cut_extrude11_tool
    add(cut_extrude11_tool.part, mode=Mode.SUBTRACT)


with BuildPart() as body_2_2:
    add(body_2_1.part)

    # Cut-Extrude11: cut by cut_extrude11_tool
    add(cut_extrude11_tool.part, mode=Mode.SUBTRACT)


with BuildPart() as body_4_2_1:
    add(body_4_2.part)

    # Cut-Extrude11: cut by cut_extrude11_tool
    add(cut_extrude11_tool.part, mode=Mode.SUBTRACT)


with BuildPart() as body_5:
    # Sketch23 → Boss-Extrude27 (new body)
    with BuildSketch(Plane.XZ):
        with BuildLine():
            Line((-44.45, 0), (-31.75, 0))
            ThreePointArc((-31.75, 0), (0, -31.75), (31.75, 0))
            Line((31.75, 0), (44.45, 0))
            ThreePointArc((44.45, 0), (0, -44.45), (-44.45, 0))
        make_face()
    extrude(amount=BOSS_EXTRUDE27_DEPTH)


solid = Compound([body_3_1.part, part_1.part, body_2_2.part, body_4_2_1.part, body_5.part])
